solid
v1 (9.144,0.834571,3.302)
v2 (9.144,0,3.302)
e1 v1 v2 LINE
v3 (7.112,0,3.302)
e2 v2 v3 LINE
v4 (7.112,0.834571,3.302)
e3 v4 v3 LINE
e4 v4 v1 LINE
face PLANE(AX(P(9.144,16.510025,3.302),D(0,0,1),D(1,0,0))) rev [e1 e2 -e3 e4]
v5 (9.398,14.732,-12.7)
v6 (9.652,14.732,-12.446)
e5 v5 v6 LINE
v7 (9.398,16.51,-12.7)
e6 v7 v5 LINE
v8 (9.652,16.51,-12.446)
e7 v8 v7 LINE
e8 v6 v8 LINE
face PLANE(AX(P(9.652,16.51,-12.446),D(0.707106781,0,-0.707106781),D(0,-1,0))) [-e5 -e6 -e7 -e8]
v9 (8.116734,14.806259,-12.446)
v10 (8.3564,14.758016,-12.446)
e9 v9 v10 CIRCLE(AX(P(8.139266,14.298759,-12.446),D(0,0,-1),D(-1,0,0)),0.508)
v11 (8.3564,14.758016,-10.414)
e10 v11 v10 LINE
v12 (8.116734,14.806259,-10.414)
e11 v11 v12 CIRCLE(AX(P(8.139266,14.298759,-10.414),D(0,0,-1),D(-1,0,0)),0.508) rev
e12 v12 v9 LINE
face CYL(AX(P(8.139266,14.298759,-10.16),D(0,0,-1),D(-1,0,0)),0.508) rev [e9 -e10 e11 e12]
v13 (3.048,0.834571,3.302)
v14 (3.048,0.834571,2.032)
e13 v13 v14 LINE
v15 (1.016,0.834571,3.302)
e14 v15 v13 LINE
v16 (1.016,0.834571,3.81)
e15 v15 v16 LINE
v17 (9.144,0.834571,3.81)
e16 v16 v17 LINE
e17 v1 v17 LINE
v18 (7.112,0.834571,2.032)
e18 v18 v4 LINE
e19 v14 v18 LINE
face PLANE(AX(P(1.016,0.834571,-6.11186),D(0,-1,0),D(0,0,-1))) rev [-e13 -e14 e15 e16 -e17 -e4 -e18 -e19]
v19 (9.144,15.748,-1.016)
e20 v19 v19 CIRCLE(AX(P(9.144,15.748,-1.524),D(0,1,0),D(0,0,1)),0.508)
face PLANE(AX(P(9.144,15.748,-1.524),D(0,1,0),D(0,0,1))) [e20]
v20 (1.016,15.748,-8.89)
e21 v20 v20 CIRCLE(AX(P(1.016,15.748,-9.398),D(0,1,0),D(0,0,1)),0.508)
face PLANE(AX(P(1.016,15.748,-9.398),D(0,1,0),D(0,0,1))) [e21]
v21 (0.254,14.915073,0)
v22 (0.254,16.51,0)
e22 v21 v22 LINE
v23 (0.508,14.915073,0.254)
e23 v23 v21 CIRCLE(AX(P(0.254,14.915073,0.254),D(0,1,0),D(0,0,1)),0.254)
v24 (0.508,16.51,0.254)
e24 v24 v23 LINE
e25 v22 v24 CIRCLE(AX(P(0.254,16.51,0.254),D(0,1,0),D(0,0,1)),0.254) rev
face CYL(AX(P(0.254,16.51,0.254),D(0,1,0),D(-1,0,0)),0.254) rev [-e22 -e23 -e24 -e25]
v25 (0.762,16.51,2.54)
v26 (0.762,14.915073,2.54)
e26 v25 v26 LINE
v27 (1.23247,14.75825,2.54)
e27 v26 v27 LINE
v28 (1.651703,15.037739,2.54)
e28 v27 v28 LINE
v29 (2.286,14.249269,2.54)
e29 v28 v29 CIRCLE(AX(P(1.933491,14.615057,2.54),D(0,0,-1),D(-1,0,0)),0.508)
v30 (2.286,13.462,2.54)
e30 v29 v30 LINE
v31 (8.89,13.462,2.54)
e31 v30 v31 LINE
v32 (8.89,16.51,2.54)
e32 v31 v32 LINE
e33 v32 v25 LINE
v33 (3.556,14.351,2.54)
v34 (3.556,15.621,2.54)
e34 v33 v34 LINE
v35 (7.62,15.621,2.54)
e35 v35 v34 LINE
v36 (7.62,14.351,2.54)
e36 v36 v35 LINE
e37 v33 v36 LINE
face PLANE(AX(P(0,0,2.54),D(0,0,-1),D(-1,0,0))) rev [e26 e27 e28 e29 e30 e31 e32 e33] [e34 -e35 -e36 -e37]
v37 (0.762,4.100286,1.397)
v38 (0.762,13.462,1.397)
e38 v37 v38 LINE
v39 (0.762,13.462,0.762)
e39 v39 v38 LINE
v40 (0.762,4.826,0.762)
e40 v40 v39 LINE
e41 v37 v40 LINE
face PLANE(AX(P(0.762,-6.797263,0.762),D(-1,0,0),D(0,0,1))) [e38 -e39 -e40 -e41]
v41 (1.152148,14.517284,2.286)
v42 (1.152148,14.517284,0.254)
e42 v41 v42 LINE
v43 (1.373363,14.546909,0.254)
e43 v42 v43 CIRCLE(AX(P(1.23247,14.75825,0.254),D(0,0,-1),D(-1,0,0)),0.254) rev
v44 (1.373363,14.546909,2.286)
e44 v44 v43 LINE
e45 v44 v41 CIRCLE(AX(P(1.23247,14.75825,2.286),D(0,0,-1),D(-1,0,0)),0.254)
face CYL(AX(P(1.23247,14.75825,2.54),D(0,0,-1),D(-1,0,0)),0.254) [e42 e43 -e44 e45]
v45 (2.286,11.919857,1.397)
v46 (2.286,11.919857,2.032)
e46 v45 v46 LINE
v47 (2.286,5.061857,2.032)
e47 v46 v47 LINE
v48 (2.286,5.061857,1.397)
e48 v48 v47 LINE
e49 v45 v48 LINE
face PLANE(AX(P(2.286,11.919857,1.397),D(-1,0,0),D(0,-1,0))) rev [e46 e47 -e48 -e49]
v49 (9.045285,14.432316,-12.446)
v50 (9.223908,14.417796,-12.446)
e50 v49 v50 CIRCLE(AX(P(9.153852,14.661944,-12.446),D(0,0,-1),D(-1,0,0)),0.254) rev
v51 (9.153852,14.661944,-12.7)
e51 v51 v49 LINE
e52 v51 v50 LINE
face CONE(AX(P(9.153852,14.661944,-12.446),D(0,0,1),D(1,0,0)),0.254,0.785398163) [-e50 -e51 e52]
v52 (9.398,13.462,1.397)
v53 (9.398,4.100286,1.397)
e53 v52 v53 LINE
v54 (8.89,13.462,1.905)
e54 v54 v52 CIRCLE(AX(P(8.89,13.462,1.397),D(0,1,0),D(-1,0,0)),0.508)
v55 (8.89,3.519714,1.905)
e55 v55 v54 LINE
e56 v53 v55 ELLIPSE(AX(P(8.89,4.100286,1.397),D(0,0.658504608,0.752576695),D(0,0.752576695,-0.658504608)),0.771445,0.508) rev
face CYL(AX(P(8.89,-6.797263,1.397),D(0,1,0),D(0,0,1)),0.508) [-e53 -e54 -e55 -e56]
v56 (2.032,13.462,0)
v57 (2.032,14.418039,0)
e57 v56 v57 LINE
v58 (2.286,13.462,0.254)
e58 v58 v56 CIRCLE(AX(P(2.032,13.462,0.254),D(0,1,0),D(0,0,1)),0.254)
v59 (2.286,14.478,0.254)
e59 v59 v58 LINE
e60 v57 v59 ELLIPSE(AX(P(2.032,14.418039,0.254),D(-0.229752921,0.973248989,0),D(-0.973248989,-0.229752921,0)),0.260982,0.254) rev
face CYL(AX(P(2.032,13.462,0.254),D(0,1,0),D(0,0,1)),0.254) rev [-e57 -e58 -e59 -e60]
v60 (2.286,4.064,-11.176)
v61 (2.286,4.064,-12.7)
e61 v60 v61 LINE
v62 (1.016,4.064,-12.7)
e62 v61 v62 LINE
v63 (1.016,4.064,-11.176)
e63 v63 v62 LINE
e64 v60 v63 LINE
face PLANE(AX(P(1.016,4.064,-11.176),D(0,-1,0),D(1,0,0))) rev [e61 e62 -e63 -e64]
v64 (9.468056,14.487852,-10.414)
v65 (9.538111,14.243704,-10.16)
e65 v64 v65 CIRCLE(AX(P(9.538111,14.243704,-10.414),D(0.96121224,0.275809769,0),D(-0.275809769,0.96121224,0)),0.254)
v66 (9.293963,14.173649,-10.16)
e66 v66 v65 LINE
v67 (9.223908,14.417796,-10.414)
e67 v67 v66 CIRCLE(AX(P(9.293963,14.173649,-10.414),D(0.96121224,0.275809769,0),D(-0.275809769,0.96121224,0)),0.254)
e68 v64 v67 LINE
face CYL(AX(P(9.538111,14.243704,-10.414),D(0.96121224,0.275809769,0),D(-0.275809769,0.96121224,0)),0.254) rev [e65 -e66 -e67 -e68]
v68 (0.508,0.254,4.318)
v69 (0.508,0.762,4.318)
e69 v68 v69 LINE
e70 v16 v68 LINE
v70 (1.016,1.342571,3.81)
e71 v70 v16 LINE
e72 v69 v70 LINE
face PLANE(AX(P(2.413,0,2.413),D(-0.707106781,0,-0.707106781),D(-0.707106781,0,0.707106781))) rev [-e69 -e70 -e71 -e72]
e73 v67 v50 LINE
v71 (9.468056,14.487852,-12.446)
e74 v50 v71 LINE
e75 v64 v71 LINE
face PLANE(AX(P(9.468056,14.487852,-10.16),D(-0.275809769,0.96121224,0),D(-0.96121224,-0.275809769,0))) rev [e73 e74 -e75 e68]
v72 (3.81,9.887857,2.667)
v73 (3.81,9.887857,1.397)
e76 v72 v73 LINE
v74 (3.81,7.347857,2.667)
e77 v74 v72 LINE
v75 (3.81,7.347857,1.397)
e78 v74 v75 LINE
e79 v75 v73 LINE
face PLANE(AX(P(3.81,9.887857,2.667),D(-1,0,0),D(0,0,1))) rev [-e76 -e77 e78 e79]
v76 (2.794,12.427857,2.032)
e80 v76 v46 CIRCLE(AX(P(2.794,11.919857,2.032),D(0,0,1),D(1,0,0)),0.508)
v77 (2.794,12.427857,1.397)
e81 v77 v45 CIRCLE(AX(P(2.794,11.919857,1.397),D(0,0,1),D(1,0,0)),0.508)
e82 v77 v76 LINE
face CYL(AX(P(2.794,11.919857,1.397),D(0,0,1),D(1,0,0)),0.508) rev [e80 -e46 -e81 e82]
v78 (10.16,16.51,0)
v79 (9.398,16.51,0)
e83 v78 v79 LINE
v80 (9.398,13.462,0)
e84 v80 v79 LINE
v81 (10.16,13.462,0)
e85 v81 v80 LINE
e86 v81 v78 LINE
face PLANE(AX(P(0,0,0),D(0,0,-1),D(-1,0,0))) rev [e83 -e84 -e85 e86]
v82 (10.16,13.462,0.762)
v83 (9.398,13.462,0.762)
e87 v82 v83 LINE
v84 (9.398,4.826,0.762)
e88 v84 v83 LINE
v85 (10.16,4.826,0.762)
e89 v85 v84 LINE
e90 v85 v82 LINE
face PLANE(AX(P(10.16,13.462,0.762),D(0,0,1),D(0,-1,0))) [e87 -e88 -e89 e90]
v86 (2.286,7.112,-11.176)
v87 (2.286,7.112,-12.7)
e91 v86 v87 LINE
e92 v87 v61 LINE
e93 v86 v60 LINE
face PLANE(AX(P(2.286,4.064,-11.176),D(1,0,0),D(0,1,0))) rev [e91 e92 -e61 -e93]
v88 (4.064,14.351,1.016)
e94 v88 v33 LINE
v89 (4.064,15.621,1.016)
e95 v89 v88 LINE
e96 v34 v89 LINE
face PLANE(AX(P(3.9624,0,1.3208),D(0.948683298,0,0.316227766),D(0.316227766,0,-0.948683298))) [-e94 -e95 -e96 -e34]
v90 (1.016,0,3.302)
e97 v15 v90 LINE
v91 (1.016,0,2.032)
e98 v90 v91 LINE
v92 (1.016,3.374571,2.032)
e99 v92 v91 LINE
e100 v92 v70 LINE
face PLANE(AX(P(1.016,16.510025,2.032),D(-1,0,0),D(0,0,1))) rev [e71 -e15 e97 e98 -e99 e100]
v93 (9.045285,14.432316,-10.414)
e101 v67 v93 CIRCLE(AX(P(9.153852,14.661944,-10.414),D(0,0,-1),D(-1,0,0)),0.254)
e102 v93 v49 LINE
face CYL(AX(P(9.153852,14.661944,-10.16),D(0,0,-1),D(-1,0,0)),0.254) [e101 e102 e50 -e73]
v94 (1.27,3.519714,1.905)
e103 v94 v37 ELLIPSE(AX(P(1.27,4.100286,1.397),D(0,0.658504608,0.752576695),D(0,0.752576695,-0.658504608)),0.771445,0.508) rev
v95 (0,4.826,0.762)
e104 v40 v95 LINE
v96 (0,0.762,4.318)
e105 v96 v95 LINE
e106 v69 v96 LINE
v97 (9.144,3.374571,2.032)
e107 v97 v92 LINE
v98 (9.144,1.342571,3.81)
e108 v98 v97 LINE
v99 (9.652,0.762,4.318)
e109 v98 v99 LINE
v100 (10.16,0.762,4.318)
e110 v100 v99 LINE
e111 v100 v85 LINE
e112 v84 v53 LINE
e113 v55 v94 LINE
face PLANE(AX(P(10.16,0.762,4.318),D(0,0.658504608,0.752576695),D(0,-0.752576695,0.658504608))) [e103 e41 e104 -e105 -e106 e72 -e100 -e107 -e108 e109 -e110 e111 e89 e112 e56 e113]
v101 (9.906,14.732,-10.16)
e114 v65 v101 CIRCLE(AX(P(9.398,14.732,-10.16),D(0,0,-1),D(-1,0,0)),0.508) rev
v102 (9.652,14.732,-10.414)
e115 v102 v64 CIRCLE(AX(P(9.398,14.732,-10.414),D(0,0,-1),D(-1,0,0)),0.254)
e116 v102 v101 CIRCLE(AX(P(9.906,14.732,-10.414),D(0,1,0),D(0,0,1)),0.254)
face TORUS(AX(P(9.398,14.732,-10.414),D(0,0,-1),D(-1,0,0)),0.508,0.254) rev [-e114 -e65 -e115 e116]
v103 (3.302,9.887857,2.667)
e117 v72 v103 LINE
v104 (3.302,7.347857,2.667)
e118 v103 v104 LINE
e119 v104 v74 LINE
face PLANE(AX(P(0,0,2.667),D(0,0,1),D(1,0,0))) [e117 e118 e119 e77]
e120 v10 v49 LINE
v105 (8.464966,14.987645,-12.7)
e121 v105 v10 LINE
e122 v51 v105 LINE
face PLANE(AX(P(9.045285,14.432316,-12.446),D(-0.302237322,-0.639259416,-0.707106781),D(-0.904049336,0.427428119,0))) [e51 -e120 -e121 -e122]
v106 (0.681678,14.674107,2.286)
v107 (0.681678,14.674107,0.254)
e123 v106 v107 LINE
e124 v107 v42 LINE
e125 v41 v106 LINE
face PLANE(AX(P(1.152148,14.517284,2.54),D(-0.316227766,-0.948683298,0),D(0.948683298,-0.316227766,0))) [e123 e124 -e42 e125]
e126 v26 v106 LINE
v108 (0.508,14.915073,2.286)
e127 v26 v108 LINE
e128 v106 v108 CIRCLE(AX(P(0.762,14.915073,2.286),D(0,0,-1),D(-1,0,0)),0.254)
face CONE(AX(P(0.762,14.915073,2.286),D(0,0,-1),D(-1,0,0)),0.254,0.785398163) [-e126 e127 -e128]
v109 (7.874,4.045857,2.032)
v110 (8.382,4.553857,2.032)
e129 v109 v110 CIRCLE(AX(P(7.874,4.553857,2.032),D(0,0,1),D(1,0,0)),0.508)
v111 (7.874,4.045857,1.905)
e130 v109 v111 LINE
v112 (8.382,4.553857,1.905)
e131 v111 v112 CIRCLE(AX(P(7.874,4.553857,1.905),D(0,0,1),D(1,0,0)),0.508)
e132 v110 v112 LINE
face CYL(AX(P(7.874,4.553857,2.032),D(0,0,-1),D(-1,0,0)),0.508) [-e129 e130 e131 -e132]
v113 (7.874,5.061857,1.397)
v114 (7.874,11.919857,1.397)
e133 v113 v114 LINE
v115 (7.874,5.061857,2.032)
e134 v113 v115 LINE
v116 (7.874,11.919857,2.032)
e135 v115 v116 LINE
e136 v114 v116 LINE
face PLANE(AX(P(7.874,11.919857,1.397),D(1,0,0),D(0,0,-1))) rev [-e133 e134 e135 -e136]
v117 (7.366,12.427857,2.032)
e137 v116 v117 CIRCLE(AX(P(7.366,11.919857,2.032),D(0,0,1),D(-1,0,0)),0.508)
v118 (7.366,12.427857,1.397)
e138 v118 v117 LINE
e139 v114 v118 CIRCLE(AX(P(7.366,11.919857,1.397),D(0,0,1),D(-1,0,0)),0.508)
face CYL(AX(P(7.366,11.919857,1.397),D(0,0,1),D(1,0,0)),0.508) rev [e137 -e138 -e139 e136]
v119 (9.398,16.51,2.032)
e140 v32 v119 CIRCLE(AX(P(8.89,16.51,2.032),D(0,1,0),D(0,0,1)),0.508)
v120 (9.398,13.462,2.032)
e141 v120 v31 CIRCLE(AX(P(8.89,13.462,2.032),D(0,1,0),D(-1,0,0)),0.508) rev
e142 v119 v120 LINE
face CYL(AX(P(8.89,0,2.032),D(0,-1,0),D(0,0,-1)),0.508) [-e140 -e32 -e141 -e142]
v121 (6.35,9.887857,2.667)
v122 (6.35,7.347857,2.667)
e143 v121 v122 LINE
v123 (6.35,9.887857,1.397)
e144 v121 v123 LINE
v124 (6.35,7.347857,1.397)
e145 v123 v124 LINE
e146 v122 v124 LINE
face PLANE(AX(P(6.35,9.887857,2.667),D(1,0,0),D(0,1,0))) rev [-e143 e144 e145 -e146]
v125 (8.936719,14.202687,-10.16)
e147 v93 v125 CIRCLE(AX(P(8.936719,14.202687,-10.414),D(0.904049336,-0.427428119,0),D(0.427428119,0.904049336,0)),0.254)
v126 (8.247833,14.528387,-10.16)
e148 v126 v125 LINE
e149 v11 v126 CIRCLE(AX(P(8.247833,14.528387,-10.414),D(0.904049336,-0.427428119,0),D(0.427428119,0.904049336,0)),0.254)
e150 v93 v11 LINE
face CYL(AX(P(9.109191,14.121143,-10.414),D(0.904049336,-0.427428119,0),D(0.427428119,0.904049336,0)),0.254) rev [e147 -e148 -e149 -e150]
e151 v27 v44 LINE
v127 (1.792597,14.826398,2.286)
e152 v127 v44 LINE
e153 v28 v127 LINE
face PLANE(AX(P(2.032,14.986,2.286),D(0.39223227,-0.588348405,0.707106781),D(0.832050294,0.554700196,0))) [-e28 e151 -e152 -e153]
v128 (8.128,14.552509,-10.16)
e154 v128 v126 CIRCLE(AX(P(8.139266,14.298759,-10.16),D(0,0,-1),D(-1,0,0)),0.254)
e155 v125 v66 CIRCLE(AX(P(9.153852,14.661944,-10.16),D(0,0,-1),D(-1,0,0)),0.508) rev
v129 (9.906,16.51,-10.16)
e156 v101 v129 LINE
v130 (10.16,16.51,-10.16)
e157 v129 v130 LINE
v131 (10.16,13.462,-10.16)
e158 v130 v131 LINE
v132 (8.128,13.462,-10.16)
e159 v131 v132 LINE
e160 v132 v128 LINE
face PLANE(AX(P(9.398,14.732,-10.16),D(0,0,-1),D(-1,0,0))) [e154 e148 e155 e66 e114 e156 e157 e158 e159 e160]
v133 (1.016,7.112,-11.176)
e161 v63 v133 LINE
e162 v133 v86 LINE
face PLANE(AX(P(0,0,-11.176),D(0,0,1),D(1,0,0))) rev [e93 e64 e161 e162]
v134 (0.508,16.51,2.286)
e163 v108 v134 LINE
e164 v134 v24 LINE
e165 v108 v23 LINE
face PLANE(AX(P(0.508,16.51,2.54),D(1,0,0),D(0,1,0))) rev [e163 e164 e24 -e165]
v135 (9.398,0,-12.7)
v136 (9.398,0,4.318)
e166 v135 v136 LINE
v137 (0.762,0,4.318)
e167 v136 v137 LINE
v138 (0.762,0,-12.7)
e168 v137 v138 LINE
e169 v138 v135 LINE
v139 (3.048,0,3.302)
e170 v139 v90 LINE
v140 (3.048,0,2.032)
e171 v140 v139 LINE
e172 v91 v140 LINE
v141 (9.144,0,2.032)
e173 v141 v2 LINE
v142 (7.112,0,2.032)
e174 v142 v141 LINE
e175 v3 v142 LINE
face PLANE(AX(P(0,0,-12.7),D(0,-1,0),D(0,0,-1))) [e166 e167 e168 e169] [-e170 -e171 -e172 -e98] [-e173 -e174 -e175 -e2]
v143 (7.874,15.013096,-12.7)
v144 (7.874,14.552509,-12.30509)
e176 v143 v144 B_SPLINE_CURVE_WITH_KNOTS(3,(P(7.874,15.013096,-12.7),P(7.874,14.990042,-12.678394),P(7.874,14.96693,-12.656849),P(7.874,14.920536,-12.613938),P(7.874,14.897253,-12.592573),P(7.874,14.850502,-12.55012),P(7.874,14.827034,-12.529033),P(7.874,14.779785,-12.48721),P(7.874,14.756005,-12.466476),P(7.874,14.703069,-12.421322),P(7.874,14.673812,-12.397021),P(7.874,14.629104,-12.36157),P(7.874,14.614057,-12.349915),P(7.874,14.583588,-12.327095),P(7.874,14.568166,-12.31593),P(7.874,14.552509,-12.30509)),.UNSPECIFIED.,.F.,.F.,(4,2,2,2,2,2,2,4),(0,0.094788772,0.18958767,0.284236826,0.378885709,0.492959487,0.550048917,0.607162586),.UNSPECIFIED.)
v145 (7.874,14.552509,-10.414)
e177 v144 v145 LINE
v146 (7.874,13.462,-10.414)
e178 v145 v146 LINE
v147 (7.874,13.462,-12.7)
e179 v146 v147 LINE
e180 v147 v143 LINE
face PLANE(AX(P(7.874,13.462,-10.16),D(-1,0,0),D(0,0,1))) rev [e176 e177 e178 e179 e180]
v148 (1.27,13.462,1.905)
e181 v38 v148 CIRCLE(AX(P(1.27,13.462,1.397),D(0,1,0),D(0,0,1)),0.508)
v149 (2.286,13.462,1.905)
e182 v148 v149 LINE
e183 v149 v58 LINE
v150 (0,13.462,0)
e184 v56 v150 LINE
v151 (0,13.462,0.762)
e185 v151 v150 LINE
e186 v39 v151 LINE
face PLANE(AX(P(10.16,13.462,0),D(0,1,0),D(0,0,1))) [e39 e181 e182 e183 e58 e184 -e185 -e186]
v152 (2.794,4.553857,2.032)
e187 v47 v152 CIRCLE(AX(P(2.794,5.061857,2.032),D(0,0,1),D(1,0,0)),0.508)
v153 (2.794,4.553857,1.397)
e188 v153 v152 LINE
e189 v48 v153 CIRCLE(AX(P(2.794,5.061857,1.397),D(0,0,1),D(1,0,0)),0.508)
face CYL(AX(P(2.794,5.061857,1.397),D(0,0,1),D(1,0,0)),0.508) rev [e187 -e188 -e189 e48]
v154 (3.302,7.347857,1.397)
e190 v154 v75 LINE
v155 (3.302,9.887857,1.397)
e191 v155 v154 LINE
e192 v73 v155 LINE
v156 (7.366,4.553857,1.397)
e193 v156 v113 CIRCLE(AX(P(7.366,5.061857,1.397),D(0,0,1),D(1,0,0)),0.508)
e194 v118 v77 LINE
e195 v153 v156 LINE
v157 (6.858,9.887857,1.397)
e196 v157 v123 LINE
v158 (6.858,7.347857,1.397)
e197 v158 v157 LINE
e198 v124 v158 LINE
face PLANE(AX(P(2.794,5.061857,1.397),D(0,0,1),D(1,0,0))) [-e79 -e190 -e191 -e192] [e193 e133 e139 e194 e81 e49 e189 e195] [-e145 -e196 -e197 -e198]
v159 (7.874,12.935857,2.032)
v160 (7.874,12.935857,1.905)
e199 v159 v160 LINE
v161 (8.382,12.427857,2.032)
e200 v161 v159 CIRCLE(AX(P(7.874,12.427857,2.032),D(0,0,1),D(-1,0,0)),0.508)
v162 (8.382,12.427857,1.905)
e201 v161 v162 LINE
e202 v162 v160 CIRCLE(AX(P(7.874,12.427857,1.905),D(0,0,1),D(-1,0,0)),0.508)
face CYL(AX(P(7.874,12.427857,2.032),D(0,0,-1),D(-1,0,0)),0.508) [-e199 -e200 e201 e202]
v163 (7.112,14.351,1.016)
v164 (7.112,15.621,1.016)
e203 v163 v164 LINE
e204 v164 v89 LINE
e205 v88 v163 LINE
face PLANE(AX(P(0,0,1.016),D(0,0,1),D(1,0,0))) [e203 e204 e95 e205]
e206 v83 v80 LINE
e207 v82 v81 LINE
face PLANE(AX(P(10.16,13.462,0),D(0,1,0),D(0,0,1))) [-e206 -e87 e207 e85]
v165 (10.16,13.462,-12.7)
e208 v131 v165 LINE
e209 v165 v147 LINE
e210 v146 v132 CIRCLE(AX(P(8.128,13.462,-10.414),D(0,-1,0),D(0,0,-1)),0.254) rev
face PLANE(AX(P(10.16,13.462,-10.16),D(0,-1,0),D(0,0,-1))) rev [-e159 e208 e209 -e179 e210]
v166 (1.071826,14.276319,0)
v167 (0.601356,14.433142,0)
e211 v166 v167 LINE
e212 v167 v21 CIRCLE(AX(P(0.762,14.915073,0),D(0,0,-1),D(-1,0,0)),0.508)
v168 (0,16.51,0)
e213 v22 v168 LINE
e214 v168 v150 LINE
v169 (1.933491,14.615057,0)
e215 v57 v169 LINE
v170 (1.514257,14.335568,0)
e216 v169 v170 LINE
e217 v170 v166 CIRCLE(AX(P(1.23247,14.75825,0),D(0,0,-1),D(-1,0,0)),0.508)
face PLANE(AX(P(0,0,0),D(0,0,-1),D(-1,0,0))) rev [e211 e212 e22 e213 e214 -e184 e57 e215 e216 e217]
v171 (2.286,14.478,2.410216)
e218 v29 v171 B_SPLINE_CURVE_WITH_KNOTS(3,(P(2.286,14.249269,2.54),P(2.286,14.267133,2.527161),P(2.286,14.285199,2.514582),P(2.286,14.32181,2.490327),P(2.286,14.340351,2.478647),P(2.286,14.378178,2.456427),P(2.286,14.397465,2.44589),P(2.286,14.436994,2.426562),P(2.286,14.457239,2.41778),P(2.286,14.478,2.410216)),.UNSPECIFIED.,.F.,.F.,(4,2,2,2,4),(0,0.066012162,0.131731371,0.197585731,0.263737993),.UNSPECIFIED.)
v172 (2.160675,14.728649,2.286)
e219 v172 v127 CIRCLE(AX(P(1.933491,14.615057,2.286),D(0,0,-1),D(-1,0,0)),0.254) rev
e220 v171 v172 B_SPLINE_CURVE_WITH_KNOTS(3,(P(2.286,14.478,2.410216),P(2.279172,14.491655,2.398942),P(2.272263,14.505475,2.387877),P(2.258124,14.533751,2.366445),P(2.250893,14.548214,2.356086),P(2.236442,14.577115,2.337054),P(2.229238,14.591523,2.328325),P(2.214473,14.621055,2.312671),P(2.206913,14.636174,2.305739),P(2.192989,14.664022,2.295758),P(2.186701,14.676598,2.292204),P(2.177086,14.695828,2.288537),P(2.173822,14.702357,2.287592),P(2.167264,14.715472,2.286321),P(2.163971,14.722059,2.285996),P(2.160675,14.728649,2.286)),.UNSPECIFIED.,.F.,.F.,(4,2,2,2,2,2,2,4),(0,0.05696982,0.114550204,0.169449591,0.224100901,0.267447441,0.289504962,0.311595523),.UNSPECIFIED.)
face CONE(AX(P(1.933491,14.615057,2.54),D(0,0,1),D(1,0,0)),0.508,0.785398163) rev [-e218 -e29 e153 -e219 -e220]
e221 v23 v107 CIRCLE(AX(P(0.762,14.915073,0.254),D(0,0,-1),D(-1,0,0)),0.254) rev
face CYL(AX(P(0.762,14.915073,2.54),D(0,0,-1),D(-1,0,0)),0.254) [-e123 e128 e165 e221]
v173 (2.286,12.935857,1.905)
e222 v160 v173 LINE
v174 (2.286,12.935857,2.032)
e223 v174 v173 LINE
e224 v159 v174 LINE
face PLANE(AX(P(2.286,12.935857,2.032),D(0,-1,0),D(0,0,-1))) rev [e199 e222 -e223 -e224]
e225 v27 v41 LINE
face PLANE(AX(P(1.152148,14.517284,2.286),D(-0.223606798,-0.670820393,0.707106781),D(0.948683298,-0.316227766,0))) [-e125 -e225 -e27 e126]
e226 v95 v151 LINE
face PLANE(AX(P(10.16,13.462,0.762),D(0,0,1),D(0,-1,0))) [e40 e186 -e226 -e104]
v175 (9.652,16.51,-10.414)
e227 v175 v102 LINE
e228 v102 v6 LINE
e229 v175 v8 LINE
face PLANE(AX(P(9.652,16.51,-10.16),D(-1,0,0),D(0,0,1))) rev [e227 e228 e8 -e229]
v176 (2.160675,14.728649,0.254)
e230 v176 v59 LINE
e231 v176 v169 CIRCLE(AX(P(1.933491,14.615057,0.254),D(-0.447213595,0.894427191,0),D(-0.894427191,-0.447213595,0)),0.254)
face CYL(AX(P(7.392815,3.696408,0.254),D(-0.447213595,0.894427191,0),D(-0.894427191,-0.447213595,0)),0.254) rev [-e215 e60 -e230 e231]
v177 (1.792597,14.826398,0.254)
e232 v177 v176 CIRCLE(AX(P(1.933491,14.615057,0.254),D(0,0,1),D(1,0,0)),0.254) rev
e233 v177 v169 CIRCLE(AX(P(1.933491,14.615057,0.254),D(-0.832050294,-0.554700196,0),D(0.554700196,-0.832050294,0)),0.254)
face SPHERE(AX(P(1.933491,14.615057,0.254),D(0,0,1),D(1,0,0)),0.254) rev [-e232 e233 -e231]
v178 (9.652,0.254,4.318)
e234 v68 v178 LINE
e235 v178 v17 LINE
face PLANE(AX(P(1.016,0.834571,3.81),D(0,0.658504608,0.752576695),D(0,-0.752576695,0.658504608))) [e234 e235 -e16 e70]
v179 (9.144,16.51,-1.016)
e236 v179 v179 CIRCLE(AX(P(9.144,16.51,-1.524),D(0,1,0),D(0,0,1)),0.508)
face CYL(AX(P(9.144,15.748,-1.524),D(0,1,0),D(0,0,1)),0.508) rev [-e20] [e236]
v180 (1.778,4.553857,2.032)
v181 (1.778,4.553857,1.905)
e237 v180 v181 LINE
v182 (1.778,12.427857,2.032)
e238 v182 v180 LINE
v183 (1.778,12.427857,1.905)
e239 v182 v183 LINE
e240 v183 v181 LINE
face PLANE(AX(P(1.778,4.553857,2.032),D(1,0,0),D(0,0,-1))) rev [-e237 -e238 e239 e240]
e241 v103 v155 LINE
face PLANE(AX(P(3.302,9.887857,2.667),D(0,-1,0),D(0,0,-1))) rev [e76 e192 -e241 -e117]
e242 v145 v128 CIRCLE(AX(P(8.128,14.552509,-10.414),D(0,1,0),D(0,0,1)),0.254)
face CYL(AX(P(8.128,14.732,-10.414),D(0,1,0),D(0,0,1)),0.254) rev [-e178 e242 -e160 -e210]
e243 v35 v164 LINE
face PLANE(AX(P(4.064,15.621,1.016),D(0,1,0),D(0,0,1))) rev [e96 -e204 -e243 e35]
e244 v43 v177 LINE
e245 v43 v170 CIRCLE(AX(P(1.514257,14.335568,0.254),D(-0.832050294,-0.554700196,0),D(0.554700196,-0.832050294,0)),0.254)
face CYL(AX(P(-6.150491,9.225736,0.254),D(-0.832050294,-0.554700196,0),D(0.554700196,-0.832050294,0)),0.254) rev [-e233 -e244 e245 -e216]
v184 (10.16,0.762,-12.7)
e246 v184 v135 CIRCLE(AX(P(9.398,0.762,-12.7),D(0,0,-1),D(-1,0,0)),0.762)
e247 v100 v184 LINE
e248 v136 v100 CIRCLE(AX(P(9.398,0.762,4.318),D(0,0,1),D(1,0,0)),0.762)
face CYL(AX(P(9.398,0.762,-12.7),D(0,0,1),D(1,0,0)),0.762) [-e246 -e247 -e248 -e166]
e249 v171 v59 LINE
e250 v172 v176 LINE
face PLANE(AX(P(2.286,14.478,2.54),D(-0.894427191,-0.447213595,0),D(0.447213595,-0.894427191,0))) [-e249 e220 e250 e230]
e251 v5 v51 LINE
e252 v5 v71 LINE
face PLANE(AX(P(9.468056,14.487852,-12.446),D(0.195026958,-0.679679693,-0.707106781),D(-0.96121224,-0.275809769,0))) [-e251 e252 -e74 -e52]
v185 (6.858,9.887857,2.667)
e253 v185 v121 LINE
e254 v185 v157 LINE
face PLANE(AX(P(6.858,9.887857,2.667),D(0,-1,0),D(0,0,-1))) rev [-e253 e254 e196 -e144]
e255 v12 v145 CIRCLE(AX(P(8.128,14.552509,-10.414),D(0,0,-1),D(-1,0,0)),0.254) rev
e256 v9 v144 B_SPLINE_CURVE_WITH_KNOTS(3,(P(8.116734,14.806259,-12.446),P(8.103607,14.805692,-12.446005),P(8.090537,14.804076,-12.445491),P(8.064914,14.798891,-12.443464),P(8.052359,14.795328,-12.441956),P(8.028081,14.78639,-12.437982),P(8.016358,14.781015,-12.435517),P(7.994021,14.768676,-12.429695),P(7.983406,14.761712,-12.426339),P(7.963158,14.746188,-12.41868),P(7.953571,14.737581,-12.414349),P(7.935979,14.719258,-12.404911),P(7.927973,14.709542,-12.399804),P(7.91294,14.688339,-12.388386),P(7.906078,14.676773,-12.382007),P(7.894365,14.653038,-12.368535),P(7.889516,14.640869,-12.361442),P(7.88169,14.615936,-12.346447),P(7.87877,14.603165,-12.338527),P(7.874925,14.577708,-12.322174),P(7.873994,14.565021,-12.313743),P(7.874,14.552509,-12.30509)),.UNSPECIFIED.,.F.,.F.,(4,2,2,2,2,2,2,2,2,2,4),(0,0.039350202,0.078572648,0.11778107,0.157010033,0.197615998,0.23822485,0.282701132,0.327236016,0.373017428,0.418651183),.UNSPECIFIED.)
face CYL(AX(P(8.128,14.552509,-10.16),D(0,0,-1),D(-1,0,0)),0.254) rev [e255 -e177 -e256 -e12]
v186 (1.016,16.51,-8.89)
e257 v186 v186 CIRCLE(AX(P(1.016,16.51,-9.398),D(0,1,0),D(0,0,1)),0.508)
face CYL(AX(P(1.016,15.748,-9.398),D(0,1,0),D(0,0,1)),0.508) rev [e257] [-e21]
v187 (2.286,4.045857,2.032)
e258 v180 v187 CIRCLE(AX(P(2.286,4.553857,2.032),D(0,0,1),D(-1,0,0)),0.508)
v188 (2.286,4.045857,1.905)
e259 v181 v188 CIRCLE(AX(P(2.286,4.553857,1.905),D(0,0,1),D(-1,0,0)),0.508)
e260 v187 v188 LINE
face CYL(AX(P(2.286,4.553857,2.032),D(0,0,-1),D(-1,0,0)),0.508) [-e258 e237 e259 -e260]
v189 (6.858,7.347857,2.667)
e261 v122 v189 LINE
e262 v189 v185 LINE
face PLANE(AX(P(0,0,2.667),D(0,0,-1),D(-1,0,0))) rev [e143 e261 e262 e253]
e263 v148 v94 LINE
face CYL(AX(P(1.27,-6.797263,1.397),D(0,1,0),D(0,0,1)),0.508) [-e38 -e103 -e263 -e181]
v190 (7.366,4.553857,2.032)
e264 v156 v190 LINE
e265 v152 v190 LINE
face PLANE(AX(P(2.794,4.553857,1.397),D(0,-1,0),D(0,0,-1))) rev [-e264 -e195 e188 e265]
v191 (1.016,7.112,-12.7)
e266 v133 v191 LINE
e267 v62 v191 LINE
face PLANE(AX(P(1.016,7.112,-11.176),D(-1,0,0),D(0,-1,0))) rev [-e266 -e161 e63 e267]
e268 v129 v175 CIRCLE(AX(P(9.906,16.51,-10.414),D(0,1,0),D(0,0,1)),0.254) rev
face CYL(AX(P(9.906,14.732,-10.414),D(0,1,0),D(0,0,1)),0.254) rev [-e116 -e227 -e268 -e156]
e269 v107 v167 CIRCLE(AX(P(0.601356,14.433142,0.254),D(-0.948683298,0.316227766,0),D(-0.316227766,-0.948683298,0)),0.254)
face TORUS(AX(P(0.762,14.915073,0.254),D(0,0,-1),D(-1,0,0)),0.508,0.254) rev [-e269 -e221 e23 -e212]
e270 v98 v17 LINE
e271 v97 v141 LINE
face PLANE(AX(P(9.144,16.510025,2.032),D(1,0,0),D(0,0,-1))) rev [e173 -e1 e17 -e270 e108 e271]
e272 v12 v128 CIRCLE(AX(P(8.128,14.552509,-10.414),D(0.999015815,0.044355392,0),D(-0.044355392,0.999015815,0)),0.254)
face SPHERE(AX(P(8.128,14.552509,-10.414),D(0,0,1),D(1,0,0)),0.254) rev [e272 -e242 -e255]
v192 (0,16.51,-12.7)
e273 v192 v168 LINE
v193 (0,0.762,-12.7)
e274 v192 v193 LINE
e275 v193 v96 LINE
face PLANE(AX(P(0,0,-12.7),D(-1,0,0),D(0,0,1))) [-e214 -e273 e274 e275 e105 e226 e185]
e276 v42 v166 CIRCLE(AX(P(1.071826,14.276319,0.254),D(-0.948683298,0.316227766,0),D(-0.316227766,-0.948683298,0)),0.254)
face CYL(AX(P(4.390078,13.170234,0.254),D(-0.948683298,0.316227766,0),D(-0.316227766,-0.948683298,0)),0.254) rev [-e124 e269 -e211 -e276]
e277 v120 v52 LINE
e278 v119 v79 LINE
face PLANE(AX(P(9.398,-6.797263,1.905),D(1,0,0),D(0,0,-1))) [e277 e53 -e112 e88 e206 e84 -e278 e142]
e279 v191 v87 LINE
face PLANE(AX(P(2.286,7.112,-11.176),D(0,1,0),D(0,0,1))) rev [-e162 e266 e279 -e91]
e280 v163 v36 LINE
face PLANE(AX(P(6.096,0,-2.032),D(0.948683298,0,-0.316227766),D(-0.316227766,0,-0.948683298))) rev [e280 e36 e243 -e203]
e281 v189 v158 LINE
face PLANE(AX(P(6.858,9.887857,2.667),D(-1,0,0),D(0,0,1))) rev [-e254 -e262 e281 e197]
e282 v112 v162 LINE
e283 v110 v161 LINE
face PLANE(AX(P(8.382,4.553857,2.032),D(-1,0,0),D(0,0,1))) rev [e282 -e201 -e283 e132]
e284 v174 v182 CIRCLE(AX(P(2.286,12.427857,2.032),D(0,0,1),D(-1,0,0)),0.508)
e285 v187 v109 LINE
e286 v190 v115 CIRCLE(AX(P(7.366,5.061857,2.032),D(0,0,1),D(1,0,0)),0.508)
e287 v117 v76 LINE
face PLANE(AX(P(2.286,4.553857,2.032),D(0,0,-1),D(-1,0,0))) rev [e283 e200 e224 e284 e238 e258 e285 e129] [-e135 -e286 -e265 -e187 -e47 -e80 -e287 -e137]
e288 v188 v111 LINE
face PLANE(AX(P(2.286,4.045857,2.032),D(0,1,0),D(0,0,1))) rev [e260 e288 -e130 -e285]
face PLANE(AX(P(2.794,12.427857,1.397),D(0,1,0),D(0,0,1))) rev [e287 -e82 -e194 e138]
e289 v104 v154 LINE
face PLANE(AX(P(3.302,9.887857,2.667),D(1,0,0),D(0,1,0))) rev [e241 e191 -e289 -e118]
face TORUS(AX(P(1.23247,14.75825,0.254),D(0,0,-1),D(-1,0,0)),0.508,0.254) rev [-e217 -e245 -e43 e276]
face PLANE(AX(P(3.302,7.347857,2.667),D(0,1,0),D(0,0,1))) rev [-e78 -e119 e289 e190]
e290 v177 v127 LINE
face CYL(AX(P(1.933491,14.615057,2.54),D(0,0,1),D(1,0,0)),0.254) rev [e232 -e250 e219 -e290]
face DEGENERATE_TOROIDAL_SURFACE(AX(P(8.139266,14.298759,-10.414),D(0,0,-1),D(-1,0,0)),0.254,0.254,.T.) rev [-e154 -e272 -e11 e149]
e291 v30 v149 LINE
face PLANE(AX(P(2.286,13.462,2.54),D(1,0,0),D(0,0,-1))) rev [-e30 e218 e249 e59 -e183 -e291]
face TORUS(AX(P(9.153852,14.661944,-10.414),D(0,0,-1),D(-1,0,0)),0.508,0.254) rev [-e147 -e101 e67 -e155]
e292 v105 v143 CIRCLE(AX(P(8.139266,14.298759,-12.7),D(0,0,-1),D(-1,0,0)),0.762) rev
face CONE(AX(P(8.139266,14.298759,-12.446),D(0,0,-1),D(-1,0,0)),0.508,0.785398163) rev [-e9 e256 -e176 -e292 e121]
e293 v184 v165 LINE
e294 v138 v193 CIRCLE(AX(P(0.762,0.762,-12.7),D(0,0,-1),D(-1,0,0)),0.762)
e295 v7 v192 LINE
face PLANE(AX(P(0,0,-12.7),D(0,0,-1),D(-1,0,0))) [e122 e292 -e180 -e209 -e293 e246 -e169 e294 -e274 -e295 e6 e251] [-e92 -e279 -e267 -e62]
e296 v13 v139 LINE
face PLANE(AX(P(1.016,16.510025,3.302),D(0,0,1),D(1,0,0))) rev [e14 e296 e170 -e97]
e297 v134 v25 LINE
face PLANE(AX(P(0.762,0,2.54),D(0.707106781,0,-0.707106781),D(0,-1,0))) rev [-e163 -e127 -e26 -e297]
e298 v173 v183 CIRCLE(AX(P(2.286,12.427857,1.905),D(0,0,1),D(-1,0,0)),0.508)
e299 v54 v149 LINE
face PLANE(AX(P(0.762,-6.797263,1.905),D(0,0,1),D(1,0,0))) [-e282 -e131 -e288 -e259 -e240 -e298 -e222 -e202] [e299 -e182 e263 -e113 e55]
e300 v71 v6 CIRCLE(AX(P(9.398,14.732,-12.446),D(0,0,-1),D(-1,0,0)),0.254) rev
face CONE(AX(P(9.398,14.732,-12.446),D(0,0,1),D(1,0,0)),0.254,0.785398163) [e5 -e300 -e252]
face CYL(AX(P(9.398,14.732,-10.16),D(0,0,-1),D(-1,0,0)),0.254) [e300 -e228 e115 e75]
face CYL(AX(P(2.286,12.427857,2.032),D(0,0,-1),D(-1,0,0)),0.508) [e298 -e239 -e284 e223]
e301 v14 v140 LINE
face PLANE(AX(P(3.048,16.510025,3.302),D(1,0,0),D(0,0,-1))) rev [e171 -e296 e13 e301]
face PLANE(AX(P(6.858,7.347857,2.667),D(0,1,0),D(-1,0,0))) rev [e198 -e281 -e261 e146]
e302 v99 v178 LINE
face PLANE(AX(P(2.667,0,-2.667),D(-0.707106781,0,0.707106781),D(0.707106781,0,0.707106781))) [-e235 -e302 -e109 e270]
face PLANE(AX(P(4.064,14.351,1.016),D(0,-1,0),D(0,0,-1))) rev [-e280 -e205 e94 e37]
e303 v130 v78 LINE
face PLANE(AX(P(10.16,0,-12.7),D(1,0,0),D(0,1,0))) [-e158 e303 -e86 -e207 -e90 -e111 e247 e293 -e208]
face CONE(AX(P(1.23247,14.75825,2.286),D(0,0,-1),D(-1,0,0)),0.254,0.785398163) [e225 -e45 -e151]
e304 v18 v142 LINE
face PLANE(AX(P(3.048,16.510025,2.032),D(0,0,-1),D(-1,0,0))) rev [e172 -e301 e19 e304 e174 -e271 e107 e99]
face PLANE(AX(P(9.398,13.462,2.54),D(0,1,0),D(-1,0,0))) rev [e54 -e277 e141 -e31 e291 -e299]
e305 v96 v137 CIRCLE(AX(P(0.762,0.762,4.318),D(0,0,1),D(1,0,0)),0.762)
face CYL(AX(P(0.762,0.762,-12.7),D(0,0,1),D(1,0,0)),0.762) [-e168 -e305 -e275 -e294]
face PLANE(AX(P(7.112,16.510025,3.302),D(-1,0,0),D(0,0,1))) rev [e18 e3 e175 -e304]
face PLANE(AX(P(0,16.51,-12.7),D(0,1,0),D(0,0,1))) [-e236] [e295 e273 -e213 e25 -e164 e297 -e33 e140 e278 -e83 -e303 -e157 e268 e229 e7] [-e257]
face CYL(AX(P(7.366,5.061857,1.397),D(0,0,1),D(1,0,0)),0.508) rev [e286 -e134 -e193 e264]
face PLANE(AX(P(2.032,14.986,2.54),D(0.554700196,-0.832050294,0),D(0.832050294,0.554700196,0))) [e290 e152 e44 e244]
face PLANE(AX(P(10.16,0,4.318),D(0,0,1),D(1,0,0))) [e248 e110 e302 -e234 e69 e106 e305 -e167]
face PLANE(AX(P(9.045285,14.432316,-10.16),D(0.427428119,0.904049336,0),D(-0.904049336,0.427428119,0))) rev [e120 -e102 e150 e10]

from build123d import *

# Parameters (mm, degrees)
SKETCH1_W           = 10.16
SKETCH1_H           = 16.51
BOSS_EXTRUDE1_DEPTH = 12.7
BOSS_EXTRUDE2_DEPTH = 10.16
SKETCH3_W           = 1.27
SKETCH3_H           = 3.048
CUT_EXTRUDE1_DEPTH  = 1.524
CUT_EXTRUDE2_DEPTH  = 2.54
SKETCH6_W           = 2.032
SKETCH6_H           = 1.27
CUT_EXTRUDE5_DEPTH  = 24.17532524
SKETCH8_W           = 8.128
SKETCH8_H           = 2.032
CUT_EXTRUDE6_DEPTH  = 2.54
CUT_EXTRUDE7_DEPTH  = 8.128
CUT_EXTRUDE8_START  = -1.778
SKETCH10_W          = 8.128
SKETCH10_H          = 0.508
CUT_EXTRUDE8_DEPTH  = 1.778
CUT_EXTRUDE9_DEPTH  = 1.778
BOSS_EXTRUDE3_REACH = 23.113
SKETCH12_W          = 8.636
SKETCH12_H          = 1.143
CUT_EXTRUDE10_DEPTH = 0.508
BOSS_EXTRUDE4_START = 0.127
BOSS_EXTRUDE4_DEPTH = 0.127
SKETCH16_W          = 0.508
SKETCH16_H          = 2.54
BOSS_EXTRUDE5_DEPTH = 1.27
SKETCH18_W          = 7.112
SKETCH18_H          = 3.048
BOSS_EXTRUDE6_DEPTH = 2.54
SKETCH19_W          = 3.048
SKETCH19_H          = 1.27
CUT_EXTRUDE11_DEPTH = 1.524
CUT_EXTRUDE12_DEPTH = 1.524
SKETCH22_R          = 0.508
CUT_EXTRUDE13_DEPTH = 0.762
BOSS_EXTRUDE8_DEPTH = 2.54
FILLET1_R           = 0.762
FILLET2_R           = 0.508
FILLET3_R           = 0.508
FILLET4_R           = 0.254
CHAMFER2_SIZE       = 0.254
FILLET5_R           = 0.254
CHAMFER3_SIZE       = 0.254
FILLET6_R           = 0.254
FILLET8_R           = 0.254


# Some blends are built 0.0001 mm under size
with BuildPart() as part:
    # Sketch1 → Boss-Extrude1 (new body)
    with BuildSketch(Plane.XY):
        with Locations((5.08, 8.255)):
            Rectangle(SKETCH1_W, SKETCH1_H)
    extrude(amount=-BOSS_EXTRUDE1_DEPTH)

    # Sketch2 → Boss-Extrude2 (add)
    with BuildSketch(Plane.ZY):
        Polygon((0, 13.462), (0.762, 13.462), (0.762, 4.826), (4.318, 0.762), (4.318, 0), (0, 0), align=None)
    extrude(amount=-BOSS_EXTRUDE2_DEPTH)

    # Sketch3 → Cut-Extrude1 (cut)
    with BuildSketch(Plane(origin=(0, 0, -12.7), x_dir=(-1, 0, 0), z_dir=(0, 0, -1))):
        with Locations((-1.651, 5.588)):
            Rectangle(SKETCH3_W, SKETCH3_H)
    extrude(amount=-CUT_EXTRUDE1_DEPTH, mode=Mode.SUBTRACT)

    # Sketch4 → Cut-Extrude2 (cut)
    with BuildSketch(Plane(origin=(0, 0, -12.7), x_dir=(-1, 0, 0), z_dir=(0, 0, -1))):
        with BuildLine():
            Line((-10.16, 13.462), (-7.874, 13.462))
            Line((-7.874, 13.462), (-7.874, 14.732))
            ThreePointArc((-7.874, 14.732), (-8.111909378, 14.806021803), (-8.356399754, 14.758016014))
            Line((-8.356399754, 14.758016014), (-9.045285349, 14.432315787))
            ThreePointArc((-9.045285349, 14.432315787), (-9.133273497, 14.40877931), (-9.223907772, 14.41779641))
            Line((-9.223907772, 14.41779641), (-9.468055681, 14.487852091))
            ThreePointArc((-9.468055681, 14.487852091), (-9.600867128, 14.579157177), (-9.652, 14.732))
            Line((-9.652, 14.732), (-9.652, 16.51))
            Line((-9.652, 16.51), (-10.16, 16.51))
            Line((-10.16, 16.51), (-10.16, 13.462))
        make_face()
    extrude(amount=-CUT_EXTRUDE2_DEPTH, mode=Mode.SUBTRACT)

    # Sketch6 → Cut-Extrude5 (cut, through all)
    with BuildSketch(Plane(origin=(0, 0, 0), x_dir=(-1, 0, 0), z_dir=(0, -1, 0))):
        with Locations((-2.032, -2.667)):
            Rectangle(SKETCH6_W, SKETCH6_H)
        with Locations((-8.128, -2.667)):
            Rectangle(SKETCH6_W, SKETCH6_H)
    extrude(amount=-CUT_EXTRUDE5_DEPTH, mode=Mode.SUBTRACT)

    # Sketch8 → Cut-Extrude6 (cut)
    with BuildSketch(Plane.XY.offset(2.032)):
        with Locations((5.08, 2.358571429)):
            Rectangle(SKETCH8_W, SKETCH8_H)
    extrude(amount=CUT_EXTRUDE6_DEPTH, mode=Mode.SUBTRACT)

    # 3DSketch3 → Cut-Extrude7 (cut, along a direction that is not the sketch's normal)
    with BuildSketch(Plane(origin=(0.508, 0.762, 4.318), x_dir=(0.5499719409228688, 0.6285393610547091, -0.5499719409228716), z_dir=(-0.7071067811865493, 0, -0.7071067811865457))):
        Polygon((0, 0), (-0.319297995, 0.395111111), (0.604385491, 0.395111111), (0.923683487, 0), align=None)
    extrude(amount=-CUT_EXTRUDE7_DEPTH, dir=(-1, 0, 0), mode=Mode.SUBTRACT)

    # Sketch10 → Cut-Extrude8 (cut)
    with BuildSketch(Plane.XY.offset(3.81).offset(CUT_EXTRUDE8_START)):
        with Locations((5.08, 1.088571429)):
            Rectangle(SKETCH10_W, SKETCH10_H)
    extrude(amount=CUT_EXTRUDE8_DEPTH, mode=Mode.SUBTRACT)

    # 3DSketch6 → Cut-Extrude9 (cut, along a direction that is not the sketch's normal)
    with BuildSketch(Plane(origin=(9.652, 0.762, 4.318), x_dir=(-0.5499719409228674, 0.6285393610547109, -0.5499719409228712), z_dir=(-0.7071067811865499, 0, 0.7071067811865451))):
        Polygon((0, 0), (0.923683487, 0), (0.604385491, 0.395111111), (-0.319297995, 0.395111111), align=None)
    extrude(amount=CUT_EXTRUDE9_DEPTH, dir=(-1, 0, 0), mode=Mode.SUBTRACT)

    # Boss-Extrude3: up to this plane
    boss_extrude3_end = Plane(origin=(10.16, 0.762, 4.318), z_dir=(0, 0.6585046078685179, 0.752576694706878))
    # Sketch12 → Boss-Extrude3 (add, up to the surface)
    with BuildSketch(Plane(origin=(0, 13.462, 0), x_dir=(1, 0, 0), z_dir=(0, 1, 0)), mode=Mode.PRIVATE) as boss_extrude3_sk1:
        with Locations((5.08, -1.3335)):
            Rectangle(SKETCH12_W, SKETCH12_H)
    boss_extrude3_tool1 = split(extrude(boss_extrude3_sk1.sketch, amount=-BOSS_EXTRUDE3_REACH, mode=Mode.PRIVATE), bisect_by=boss_extrude3_end, keep=Keep.BOTH, mode=Mode.PRIVATE)
    add(boss_extrude3_tool1.solids().sort_by_distance((5.08, 13.462, 1.3335))[0])

    # Sketch13 → Cut-Extrude10 (cut)
    with BuildSketch(Plane.XY.offset(1.905)):
        with BuildLine():
            Line((2.794, 12.427857143), (7.366, 12.427857143))
            ThreePointArc((7.366, 12.427857143), (7.725210245, 12.279067388), (7.874, 11.919857143))
            Line((7.874, 11.919857143), (7.874, 5.061857143))
            ThreePointArc((7.874, 5.061857143), (7.725210245, 4.702646898), (7.366, 4.553857143))
            Line((7.366, 4.553857143), (2.794, 4.553857143))
            ThreePointArc((2.794, 4.553857143), (2.434789755, 4.702646898), (2.286, 5.061857143))
            Line((2.286, 5.061857143), (2.286, 11.919857143))
            ThreePointArc((2.286, 11.919857143), (2.434789755, 12.279067388), (2.794, 12.427857143))
        make_face()
    extrude(amount=-CUT_EXTRUDE10_DEPTH, mode=Mode.SUBTRACT)

    # Sketch14 → Boss-Extrude4 (add)
    with BuildSketch(Plane.XY.offset(1.905).offset(BOSS_EXTRUDE4_START)):
        with BuildLine():
            Line((2.286, 4.045857143), (7.874, 4.045857143))
            ThreePointArc((7.874, 4.045857143), (8.233210245, 4.194646898), (8.382, 4.553857143))
            Line((8.382, 4.553857143), (8.382, 12.427857143))
            ThreePointArc((8.382, 12.427857143), (8.233210245, 12.787067388), (7.874, 12.935857143))
            Line((7.874, 12.935857143), (2.286, 12.935857143))
            ThreePointArc((2.286, 12.935857143), (1.926789755, 12.787067388), (1.778, 12.427857143))
            Line((1.778, 12.427857143), (1.778, 4.553857143))
            ThreePointArc((1.778, 4.553857143), (1.926789755, 4.194646898), (2.286, 4.045857143))
        make_face()
        with BuildLine():
            Line((2.794, 12.427857143), (7.366, 12.427857143))
            ThreePointArc((7.366, 12.427857143), (7.725210245, 12.279067388), (7.874, 11.919857143))
            Line((7.874, 11.919857143), (7.874, 5.061857143))
            ThreePointArc((7.874, 5.061857143), (7.725210245, 4.702646898), (7.366, 4.553857143))
            Line((7.366, 4.553857143), (2.794, 4.553857143))
            ThreePointArc((2.794, 4.553857143), (2.434789755, 4.702646898), (2.286, 5.061857143))
            Line((2.286, 5.061857143), (2.286, 11.919857143))
            ThreePointArc((2.286, 11.919857143), (2.434789755, 12.279067388), (2.794, 12.427857143))
        make_face(mode=Mode.SUBTRACT)
    extrude(amount=-BOSS_EXTRUDE4_DEPTH)

    # Sketch16 → Boss-Extrude5 (add)
    with BuildSketch(Plane.XY.offset(1.397)):
        with Locations((3.556, 8.617857143)):
            Rectangle(SKETCH16_W, SKETCH16_H)
        with Locations((6.604, 8.617857143)):
            Rectangle(SKETCH16_W, SKETCH16_H)
    extrude(amount=BOSS_EXTRUDE5_DEPTH)

    # Sketch18 → Boss-Extrude6 (add)
    with BuildSketch(Plane.XY):
        with Locations((5.842, 14.986)):
            Rectangle(SKETCH18_W, SKETCH18_H)
    extrude(amount=BOSS_EXTRUDE6_DEPTH)

    # Sketch19 → Cut-Extrude11 (cut)
    with BuildSketch(Plane.XY.offset(2.54)):
        with Locations((5.588, 14.986)):
            Rectangle(SKETCH19_W, SKETCH19_H)
    extrude(amount=-CUT_EXTRUDE11_DEPTH, mode=Mode.SUBTRACT)

    # 3DSketch8 → Cut-Extrude12 (cut, along a direction that is not the sketch's normal)
    with BuildSketch(Plane(origin=(4.064, 15.621, 1.016), x_dir=(-0.24806946917841682, -0.6201736729460425, 0.7442084075352507), z_dir=(-0.9486832980505139, 0, -0.31622776601683783))):
        Polygon((0, 0), (1.260192903, 0.996269967), (2.047813468, 0), (0.787620565, -0.996269967), align=None)
    cut_extrude12 = extrude(amount=-CUT_EXTRUDE12_DEPTH, dir=(-1, 0, 0), mode=Mode.SUBTRACT)

    # Mirror1: Cut-Extrude12 across plane
    add(cut_extrude12.mirror(Plane(origin=(5.588, 0, 0), x_dir=(0, 0, 1), z_dir=(1, 0, 0))), mode=Mode.SUBTRACT)

    # Sketch22 → Cut-Extrude13 (cut)
    with BuildSketch(Plane(origin=(0, 16.51, 0), x_dir=(1, 0, 0), z_dir=(0, 1, 0))):
        with Locations(Location((9.144, 1.524, 0), (0, 0, 270))):
            Circle(SKETCH22_R)
        with Locations(Location((1.016, 9.398, 0), (0, 0, 270))):
            Circle(SKETCH22_R)
    extrude(amount=-CUT_EXTRUDE13_DEPTH, mode=Mode.SUBTRACT)

    # Sketch23 → Boss-Extrude8 (add)
    with BuildSketch(Plane.XY):
        with BuildLine():
            Line((2.286, 16.51), (0.508, 16.51))
            Line((0.508, 16.51), (0.508, 14.915072842))
            ThreePointArc((0.508, 14.915072842), (0.555944485, 14.76655643), (0.681678147, 14.674107284))
            Line((0.681678147, 14.674107284), (1.152147648, 14.517284117))
            ThreePointArc((1.152147648, 14.517284117), (1.266183721, 14.506497115), (1.37336335, 14.5469089))
            Line((1.37336335, 14.5469089), (2.032, 14.986))
            Line((2.032, 14.986), (2.286, 14.478))
            Line((2.286, 14.478), (2.286, 16.51))
        make_face()
    extrude(amount=BOSS_EXTRUDE8_DEPTH)

    # Fillet1
    fillet1_edges = [part.edges().sort_by_distance(p)[0] for p in [
        (10.16, 0, -4.191),
        (0, 0, -4.191),
    ]]
    fillet(fillet1_edges, radius=FILLET1_R)

    # Fillet2
    fillet2_edges = [part.edges().sort_by_distance(p)[0] for p in [
        (9.398, 8.490857143, 1.905),
        (0.762, 8.490857143, 1.905),
    ]]
    fillet(fillet2_edges, radius=FILLET2_R)

    # Fillet3
    fillet3_edges = [part.edges().sort_by_distance(p)[0] for p in [
        (9.398, 14.986, 2.54),
    ]]
    fillet(fillet3_edges, radius=FILLET3_R)

    # Fillet4
    fillet4_edges = [part.edges().sort_by_distance(p)[0] for p in [
        (2.032, 14.986, 1.27),
    ]]
    fillet(fillet4_edges, radius=FILLET4_R)

    # Chamfer2
    # the kernel refuses this chamfer: 0.254 mm, written as the material it takes off along each edge
    with BuildSketch(Plane(origin=(1.933490778, 14.615057177, 2.54), x_dir=(-0.512799244946166, -0.8585085523060572, 0), z_dir=(-0.8585085523060572, 0.512799244946166, 0))) as chamfer2_piece_1:
        Polygon((0.254 + CHAMFER2_SIZE, 0), (0.254, -CHAMFER2_SIZE), (0.254, 0), align=None)
    revolve(axis=Axis((1.933490778, 14.615057177, 2.54), (0, 0, 1)), revolution_arc=244.54053411, mode=Mode.SUBTRACT)
    with BuildSketch(Plane(origin=(1.37336335, 14.5469089, 2.54), x_dir=(-0.5547001962252276, 0.8320502943378448, 0), z_dir=(0.8320502943378448, 0.5547001962252276, 0))) as chamfer2_piece_2:
        Polygon((CHAMFER2_SIZE, 0), (0, -CHAMFER2_SIZE), (0, 0), align=None)
    extrude(amount=0.503856054, mode=Mode.SUBTRACT)
    with BuildSketch(Plane(origin=(1.232469501, 14.758249675, 2.54), x_dir=(-0.31622776601683666, -0.9486832980505143, 0), z_dir=(-0.9486832980505143, 0.31622776601683666, 0))) as chamfer2_piece_3:
        Polygon((0.254 - CHAMFER2_SIZE, 0), (0.254, -CHAMFER2_SIZE), (0.254, 0), align=None)
    revolve(axis=Axis((1.232469501, 14.758249675, 2.54), (0, 0, 1)), revolution_arc=52.125016349, mode=Mode.SUBTRACT)
    with BuildSketch(Plane(origin=(0.681678147, 14.674107284, 2.54), x_dir=(0.3162277660168374, 0.948683298050514, 0), z_dir=(0.948683298050514, -0.3162277660168374, 0))) as chamfer2_piece_4:
        Polygon((CHAMFER2_SIZE, 0), (0, -CHAMFER2_SIZE), (0, 0), align=None)
    extrude(amount=0.495918397, mode=Mode.SUBTRACT)
    with BuildSketch(Plane(origin=(0.762, 14.915072842, 2.54), x_dir=(-1, 0, 0), z_dir=(0, 1, 0))) as chamfer2_piece_5:
        Polygon((0.254 - CHAMFER2_SIZE, 0), (0.254, -CHAMFER2_SIZE), (0.254, 0), align=None)
    revolve(axis=Axis((0.762, 14.915072842, 2.54), (0, 0, 1)), revolution_arc=71.565051177, mode=Mode.SUBTRACT)
    with BuildSketch(Plane(origin=(0.508, 17.163207479, 2.54), x_dir=(1, 0, 0), z_dir=(0, -1, 0))) as chamfer2_piece_6:
        Polygon((CHAMFER2_SIZE, 0), (0, -CHAMFER2_SIZE), (0, 0), align=None)
    extrude(amount=2.248134637, mode=Mode.SUBTRACT)

    # Fillet5
    fillet5_edges = [part.edges().sort_by_distance(p)[0] for p in [
        (2.223337642, 14.603324715, 0),
        (1.998684434, 14.860548088, 0),
        (1.582980139, 14.686653426, 0),
        (1.266183721, 14.506497115, 0),
        (0.916912898, 14.595695701, 0),
        (0.555944485, 14.76655643, 0),
        (0.508, 15.712536421, 0),
        (2.286, 13.97, 0),
    ]]
    fillet(fillet5_edges, radius=FILLET5_R)

    # Chamfer3
    chamfer3_edges = [part.edges().sort_by_distance(p)[0] for p in [
        (8.111909378, 14.806021803, -12.7),
        (8.700842551, 14.595165901, -12.7),
        (9.133273497, 14.40877931, -12.7),
        (9.345981727, 14.45282425, -12.7),
        (9.600867128, 14.579157177, -12.7),
        (9.652, 15.621, -12.7),
    ]]
    chamfer(chamfer3_edges, length=CHAMFER3_SIZE - 0.0001)  # a hair under: the kernel refuses the full size

    # Fillet6
    fillet6_edges = [part.edges().sort_by_distance(p)[0] for p in [
        (7.874, 14.732, -11.30305),
    ]]
    fillet(fillet6_edges, radius=FILLET6_R)

    # Fillet8
    fillet8_edges = [part.edges().sort_by_distance(p)[0] for p in [
        (9.652, 15.621, -10.16),
        (9.600867128, 14.579157177, -10.16),
        (9.345981727, 14.45282425, -10.16),
        (9.133273497, 14.40877931, -10.16),
        (8.239512108, 14.796769766, -10.16),
        (8.700842551, 14.595165901, -10.16),
        (7.944454866, 14.728085686, -10.16),
        (7.874, 14.007254484, -10.16),
    ]]
    fillet(fillet8_edges, radius=FILLET8_R)


solid = part.part
